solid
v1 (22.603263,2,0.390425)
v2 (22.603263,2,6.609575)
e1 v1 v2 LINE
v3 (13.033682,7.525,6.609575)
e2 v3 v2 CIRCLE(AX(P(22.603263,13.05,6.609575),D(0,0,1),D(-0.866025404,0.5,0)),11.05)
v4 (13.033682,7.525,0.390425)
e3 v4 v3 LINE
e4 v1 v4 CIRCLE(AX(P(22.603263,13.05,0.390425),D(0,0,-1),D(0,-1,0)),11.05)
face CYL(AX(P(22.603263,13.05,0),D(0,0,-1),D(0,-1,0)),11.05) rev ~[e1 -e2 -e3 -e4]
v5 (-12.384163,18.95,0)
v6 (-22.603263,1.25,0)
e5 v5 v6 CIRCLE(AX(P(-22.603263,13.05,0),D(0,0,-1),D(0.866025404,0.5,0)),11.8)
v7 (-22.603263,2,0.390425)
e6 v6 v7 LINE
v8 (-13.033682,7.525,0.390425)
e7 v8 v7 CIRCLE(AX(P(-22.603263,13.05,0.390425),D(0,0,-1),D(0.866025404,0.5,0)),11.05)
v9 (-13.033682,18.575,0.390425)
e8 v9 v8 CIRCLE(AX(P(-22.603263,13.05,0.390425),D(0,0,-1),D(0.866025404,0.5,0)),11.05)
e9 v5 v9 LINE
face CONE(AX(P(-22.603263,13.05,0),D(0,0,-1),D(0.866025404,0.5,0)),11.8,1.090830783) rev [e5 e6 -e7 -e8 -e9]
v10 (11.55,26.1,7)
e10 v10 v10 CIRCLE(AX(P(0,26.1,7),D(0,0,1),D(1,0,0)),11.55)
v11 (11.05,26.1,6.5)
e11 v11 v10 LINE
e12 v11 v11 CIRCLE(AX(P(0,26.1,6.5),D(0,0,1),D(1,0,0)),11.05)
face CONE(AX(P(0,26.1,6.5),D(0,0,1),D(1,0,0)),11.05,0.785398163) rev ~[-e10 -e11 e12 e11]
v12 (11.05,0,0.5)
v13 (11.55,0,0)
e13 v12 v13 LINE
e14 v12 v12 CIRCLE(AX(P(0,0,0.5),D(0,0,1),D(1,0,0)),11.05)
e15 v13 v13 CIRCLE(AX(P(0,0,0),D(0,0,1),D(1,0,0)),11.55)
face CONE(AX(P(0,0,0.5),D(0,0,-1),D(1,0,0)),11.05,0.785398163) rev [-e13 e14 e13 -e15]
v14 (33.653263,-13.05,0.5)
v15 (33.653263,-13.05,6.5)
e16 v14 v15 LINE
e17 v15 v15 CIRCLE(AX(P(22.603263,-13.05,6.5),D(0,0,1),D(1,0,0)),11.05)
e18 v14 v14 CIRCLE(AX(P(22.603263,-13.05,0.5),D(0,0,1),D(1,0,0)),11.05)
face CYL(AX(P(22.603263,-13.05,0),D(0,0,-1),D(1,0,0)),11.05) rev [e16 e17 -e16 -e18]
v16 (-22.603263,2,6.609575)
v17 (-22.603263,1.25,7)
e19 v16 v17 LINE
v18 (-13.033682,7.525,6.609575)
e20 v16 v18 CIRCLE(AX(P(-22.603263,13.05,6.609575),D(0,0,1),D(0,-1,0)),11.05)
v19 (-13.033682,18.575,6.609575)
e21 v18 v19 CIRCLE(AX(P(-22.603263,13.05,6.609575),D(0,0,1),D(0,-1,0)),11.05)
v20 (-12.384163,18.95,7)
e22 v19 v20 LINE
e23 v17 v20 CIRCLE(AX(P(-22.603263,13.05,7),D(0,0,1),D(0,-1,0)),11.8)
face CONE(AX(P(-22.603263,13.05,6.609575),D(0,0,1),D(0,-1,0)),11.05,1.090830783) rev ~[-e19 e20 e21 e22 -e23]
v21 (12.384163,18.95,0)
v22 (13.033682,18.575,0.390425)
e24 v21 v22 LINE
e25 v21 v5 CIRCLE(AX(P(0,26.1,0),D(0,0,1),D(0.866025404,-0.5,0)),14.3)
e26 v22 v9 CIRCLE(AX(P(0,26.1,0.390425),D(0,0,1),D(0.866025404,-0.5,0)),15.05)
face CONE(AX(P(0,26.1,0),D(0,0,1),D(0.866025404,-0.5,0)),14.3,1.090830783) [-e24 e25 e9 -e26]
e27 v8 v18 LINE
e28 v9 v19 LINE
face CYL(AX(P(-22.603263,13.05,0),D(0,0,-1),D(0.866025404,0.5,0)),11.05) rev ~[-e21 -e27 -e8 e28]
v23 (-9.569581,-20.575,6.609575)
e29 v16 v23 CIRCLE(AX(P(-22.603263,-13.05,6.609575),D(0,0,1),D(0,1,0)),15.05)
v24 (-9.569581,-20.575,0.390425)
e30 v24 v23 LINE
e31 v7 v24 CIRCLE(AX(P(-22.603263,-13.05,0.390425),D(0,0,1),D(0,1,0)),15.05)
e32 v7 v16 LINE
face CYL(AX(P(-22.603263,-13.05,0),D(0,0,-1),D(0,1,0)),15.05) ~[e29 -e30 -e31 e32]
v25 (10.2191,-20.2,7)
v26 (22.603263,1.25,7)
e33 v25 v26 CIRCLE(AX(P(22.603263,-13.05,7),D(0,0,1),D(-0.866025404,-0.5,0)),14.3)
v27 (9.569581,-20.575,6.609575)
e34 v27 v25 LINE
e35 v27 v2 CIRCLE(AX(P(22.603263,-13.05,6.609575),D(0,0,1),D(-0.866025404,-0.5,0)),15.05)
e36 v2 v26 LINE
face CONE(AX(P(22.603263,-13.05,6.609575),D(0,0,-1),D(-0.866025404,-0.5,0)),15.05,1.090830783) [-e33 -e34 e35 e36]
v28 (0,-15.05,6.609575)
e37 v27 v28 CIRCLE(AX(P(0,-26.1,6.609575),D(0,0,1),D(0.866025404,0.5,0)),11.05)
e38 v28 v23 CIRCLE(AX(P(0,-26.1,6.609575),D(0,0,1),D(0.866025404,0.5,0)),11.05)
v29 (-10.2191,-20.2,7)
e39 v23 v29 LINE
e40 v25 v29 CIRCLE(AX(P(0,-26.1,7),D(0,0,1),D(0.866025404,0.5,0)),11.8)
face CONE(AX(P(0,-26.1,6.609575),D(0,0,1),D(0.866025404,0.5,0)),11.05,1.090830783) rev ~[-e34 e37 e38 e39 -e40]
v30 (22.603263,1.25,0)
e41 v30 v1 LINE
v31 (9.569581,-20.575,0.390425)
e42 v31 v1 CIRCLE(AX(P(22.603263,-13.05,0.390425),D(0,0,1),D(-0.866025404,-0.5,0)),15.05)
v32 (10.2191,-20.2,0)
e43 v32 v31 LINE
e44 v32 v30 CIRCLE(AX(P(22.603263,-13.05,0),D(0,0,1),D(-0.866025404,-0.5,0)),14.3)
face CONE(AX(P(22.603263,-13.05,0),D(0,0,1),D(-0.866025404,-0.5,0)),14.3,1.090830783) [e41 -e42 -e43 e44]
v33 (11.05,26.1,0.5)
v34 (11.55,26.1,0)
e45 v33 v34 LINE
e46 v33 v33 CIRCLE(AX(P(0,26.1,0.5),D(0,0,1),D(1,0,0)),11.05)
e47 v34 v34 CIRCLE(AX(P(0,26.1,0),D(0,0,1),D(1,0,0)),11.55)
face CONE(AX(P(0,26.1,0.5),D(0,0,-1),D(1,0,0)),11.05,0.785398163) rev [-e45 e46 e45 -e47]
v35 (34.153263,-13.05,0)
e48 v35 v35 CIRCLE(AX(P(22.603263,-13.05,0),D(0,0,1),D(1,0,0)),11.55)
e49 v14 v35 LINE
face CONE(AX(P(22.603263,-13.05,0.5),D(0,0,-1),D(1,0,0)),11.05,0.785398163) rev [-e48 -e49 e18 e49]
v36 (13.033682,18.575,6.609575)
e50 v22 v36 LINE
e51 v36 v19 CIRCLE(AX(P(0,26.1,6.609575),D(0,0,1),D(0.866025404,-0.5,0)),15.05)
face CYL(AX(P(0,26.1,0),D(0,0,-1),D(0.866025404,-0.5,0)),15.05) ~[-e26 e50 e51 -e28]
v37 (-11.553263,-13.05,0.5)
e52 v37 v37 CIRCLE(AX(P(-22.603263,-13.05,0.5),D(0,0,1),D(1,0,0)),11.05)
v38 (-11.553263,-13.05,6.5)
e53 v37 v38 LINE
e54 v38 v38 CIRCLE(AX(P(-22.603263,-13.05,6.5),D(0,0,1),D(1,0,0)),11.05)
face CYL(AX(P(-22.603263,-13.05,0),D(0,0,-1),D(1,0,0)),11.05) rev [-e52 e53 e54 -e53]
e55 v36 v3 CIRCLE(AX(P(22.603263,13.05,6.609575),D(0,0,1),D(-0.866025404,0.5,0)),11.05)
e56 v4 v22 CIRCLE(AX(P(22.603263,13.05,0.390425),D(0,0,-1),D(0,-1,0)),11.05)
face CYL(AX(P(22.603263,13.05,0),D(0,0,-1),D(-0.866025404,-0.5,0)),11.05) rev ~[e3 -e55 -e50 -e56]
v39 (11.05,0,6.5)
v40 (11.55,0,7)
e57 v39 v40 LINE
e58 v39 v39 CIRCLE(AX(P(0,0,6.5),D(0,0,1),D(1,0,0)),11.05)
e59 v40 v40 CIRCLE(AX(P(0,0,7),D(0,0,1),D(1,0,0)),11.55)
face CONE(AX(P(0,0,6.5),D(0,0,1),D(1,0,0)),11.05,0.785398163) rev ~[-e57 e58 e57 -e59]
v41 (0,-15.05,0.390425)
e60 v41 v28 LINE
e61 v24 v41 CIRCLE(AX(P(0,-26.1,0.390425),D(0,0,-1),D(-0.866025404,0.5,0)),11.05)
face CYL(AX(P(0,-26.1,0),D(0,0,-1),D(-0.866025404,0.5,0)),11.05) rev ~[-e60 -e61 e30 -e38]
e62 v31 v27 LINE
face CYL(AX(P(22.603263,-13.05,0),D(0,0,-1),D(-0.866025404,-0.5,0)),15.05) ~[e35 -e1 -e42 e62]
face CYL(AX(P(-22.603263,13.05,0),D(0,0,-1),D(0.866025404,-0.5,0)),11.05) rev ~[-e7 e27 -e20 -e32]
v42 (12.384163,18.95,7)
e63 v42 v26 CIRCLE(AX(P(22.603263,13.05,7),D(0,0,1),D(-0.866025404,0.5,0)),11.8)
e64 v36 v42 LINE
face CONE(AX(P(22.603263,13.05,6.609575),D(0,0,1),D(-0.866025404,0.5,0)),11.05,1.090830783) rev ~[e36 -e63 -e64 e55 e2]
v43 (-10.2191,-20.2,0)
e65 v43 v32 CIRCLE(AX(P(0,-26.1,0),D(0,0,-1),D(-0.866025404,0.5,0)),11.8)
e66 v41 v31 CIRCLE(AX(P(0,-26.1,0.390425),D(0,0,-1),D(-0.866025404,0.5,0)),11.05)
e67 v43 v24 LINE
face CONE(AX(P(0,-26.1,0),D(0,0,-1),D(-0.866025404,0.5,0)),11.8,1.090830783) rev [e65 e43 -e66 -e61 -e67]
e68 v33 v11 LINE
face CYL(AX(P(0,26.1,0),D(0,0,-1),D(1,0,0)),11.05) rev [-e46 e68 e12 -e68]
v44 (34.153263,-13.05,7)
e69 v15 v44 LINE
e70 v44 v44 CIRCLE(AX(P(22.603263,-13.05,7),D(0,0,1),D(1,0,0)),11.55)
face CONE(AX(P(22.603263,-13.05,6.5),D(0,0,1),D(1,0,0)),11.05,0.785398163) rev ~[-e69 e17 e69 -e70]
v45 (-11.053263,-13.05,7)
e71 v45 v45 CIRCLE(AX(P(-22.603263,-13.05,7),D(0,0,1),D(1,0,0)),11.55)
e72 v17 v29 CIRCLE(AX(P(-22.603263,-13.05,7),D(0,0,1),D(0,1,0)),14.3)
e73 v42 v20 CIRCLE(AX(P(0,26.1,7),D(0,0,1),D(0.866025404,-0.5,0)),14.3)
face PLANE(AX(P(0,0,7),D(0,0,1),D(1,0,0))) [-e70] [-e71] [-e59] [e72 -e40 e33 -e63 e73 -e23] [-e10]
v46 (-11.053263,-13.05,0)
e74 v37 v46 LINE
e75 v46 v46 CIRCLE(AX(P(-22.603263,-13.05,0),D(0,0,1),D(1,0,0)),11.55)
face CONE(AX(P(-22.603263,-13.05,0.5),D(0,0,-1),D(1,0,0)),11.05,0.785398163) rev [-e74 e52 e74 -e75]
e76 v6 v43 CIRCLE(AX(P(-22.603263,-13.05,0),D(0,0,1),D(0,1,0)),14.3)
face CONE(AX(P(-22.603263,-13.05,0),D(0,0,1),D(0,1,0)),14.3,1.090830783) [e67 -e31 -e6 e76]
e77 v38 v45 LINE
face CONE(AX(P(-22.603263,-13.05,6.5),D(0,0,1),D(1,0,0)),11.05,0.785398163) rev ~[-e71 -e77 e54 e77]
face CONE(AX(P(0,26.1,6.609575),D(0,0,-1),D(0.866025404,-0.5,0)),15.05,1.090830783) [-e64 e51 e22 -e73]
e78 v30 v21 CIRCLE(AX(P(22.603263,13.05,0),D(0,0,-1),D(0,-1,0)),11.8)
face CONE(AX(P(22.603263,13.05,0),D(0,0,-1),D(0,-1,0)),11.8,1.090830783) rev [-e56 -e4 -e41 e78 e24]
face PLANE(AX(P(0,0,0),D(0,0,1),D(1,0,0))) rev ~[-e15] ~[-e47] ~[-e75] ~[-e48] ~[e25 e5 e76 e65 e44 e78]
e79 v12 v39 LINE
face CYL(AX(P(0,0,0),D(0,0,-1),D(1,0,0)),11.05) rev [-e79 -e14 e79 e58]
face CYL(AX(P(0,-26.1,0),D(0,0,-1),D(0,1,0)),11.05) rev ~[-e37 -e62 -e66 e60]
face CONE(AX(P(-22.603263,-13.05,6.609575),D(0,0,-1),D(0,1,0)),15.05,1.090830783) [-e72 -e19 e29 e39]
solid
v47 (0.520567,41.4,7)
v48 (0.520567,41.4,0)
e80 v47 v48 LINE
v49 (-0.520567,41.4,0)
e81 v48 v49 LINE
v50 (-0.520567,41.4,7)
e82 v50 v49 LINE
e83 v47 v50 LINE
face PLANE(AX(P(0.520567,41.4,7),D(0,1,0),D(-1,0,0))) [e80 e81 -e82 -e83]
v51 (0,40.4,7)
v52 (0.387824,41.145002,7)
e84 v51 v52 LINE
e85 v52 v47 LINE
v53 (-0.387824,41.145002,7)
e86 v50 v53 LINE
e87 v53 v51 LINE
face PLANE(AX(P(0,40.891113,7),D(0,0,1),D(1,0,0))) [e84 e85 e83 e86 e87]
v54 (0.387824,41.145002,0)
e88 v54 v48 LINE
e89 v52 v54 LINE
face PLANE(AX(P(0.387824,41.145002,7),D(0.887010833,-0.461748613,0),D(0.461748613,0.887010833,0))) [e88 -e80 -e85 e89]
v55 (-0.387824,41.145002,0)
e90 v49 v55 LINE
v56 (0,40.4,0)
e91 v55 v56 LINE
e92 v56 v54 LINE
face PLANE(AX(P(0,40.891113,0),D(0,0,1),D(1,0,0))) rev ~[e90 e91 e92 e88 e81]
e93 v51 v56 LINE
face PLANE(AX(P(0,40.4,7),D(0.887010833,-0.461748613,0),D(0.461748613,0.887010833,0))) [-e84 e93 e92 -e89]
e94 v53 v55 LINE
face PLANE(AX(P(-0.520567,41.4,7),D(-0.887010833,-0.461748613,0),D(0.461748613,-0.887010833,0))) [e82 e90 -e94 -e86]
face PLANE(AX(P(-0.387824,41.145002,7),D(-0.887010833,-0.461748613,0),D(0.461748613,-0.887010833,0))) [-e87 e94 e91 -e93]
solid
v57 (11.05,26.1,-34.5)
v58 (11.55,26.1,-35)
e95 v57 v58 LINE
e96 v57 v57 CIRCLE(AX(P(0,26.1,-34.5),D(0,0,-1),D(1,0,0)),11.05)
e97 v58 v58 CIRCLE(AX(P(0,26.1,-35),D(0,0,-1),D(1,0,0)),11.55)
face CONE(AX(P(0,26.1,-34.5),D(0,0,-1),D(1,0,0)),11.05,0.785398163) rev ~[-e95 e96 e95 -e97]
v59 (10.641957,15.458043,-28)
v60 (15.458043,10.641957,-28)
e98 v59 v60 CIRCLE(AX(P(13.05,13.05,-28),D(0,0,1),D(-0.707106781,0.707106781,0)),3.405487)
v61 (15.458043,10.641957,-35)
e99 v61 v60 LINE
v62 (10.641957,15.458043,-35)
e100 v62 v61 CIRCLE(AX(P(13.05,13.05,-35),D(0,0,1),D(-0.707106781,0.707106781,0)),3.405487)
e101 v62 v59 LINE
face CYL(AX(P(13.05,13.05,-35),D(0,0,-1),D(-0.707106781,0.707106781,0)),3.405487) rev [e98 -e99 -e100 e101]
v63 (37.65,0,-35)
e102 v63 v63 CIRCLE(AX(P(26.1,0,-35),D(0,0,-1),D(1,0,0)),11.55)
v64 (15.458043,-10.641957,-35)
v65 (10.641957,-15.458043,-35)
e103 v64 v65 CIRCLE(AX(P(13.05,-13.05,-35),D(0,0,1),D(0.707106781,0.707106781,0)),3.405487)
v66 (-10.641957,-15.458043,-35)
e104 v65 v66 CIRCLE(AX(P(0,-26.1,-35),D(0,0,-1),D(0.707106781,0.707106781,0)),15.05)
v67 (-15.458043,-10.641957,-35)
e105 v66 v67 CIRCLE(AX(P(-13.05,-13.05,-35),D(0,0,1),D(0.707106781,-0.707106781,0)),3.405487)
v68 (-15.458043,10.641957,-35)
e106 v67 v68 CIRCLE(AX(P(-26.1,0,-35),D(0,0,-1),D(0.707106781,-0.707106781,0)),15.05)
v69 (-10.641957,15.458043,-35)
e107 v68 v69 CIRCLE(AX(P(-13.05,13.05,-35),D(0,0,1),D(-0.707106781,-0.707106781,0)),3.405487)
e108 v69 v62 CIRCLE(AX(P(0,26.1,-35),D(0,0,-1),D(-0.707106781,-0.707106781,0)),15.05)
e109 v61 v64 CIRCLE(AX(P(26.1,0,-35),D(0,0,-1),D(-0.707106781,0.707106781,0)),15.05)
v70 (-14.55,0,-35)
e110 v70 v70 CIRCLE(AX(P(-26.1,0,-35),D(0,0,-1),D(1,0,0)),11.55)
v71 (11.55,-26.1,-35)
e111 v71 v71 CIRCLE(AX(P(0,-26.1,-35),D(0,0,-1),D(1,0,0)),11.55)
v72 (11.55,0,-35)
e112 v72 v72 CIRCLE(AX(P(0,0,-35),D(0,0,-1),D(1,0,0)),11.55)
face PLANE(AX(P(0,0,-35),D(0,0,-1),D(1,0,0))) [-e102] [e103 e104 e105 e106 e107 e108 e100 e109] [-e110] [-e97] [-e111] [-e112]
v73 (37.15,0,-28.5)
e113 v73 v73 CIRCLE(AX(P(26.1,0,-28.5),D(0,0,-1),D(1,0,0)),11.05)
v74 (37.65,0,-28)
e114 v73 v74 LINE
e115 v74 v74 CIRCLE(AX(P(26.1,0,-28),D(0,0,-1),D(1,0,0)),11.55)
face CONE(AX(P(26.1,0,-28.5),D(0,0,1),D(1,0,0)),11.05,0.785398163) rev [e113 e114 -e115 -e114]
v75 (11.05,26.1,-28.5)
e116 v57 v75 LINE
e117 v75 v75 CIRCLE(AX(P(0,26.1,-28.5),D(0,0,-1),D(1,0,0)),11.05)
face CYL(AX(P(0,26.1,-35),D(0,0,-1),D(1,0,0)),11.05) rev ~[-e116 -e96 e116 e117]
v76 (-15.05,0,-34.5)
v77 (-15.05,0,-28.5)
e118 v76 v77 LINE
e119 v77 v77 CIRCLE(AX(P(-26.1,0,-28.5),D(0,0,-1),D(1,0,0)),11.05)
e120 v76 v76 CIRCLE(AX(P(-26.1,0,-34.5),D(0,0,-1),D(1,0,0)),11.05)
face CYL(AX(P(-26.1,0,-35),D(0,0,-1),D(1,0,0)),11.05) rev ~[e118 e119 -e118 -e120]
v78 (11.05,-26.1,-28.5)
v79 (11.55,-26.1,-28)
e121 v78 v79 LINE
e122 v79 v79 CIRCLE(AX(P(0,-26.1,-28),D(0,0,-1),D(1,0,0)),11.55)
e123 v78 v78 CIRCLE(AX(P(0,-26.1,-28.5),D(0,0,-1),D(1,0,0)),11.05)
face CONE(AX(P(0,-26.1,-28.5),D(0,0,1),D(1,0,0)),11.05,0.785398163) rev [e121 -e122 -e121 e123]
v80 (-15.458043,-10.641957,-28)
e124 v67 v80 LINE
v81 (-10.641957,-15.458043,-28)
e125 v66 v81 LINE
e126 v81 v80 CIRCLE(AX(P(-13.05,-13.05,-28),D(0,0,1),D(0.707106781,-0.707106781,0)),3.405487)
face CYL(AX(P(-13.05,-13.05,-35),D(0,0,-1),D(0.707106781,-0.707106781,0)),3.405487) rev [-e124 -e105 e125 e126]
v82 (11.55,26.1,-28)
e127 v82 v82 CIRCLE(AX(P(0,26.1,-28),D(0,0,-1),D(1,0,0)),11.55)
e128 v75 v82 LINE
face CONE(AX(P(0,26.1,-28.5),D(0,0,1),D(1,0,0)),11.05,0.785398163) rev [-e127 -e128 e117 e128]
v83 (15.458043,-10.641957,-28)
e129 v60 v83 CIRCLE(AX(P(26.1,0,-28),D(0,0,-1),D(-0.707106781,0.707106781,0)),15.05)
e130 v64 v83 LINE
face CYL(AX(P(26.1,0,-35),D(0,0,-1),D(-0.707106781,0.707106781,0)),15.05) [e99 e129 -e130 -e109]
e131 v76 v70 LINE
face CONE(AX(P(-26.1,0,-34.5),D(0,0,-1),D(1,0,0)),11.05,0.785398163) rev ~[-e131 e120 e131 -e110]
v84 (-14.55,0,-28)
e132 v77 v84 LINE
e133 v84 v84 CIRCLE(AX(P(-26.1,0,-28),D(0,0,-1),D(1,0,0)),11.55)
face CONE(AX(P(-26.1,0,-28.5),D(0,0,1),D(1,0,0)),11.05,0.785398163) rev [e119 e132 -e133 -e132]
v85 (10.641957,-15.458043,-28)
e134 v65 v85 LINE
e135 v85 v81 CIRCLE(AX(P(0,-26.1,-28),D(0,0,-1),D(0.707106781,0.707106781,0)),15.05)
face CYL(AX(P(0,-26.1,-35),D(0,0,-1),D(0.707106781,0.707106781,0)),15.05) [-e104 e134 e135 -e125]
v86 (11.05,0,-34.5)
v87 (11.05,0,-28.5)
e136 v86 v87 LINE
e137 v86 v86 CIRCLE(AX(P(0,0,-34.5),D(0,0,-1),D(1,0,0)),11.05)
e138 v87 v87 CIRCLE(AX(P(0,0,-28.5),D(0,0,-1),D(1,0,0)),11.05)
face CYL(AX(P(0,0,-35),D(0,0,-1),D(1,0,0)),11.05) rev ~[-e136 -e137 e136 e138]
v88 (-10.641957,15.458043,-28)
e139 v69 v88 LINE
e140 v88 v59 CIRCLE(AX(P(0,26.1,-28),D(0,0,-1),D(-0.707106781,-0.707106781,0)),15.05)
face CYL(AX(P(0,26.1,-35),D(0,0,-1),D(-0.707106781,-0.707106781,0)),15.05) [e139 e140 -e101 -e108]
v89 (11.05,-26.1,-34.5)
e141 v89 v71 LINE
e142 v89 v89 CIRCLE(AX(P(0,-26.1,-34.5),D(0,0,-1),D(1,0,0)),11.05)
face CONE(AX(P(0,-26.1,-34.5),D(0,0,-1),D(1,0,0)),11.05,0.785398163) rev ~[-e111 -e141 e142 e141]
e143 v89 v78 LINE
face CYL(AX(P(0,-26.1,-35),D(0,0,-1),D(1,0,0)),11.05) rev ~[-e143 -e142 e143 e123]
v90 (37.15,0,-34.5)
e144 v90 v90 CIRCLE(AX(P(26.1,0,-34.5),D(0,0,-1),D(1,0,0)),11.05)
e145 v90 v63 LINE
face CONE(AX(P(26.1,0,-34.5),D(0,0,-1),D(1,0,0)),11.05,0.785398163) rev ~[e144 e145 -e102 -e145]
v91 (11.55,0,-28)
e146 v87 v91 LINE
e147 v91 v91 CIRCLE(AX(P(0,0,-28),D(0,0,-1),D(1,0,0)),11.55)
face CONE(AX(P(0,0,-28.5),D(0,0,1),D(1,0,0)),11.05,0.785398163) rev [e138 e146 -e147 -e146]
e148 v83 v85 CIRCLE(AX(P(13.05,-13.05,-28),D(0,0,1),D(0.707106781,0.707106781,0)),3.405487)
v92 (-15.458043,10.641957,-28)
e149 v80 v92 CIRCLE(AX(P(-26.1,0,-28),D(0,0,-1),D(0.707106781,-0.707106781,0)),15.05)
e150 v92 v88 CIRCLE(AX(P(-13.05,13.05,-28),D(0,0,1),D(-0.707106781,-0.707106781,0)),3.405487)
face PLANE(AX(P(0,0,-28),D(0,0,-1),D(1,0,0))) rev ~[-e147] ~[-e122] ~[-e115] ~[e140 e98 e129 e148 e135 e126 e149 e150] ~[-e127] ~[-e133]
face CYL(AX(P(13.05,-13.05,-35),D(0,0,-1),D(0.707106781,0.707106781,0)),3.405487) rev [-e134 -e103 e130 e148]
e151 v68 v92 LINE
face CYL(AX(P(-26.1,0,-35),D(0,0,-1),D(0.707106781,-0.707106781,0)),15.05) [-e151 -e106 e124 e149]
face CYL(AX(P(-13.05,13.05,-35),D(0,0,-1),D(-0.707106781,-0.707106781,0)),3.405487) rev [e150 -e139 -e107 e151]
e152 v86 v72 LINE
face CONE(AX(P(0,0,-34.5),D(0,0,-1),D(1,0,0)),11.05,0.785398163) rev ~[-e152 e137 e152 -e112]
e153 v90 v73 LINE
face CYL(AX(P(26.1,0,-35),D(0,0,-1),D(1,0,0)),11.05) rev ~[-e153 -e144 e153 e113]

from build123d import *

# Parameters (mm, degrees)
F0_R         = 11.05
F1_DEPTH     = 7
F2_SIZE      = 0.5
F4_R         = 11.05
F5_DEPTH     = 7
F6_SIZE      = 0.5
F8_T2_ANGLE  = 120
F8_T4_ANGLE  = 120
F8_T6_ANGLE  = 240
F8_T8_ANGLE  = 120
F8_T10_ANGLE = 240
F8_T12_ANGLE = 120
F8_T14_ANGLE = 120
F8_T16_ANGLE = 240
F8_T18_ANGLE = 120
F8_T20_ANGLE = 240
F8_T22_ANGLE = 240
F8_T24_ANGLE = 240
F9_DEPTH     = 7


# Not quite as in the source:
# - a fillet or chamfer that OpenCascade refuses, or shapes differently, is made with other operations: its cross-section is extruded or revolved along the edge and cut away or added


with BuildPart() as f1:
    # F0 (on Top) → F1 (new body)
    with BuildSketch(Plane.XY):
        with BuildLine():
            ThreePointArc((13.033682327, 7.525), (11.5532630388, 13.05), (13.033682327, 18.575))
            ThreePointArc((13.033682327, 18.575), (0, 41.15), (-13.033682327, 18.575))
            ThreePointArc((-13.033682327, 18.575), (-11.5532630388, 13.05), (-13.033682327, 7.525))
            ThreePointArc((-13.033682327, 7.525), (-17.0782630388, 3.4804192882), (-22.6032630388, 2))
            ThreePointArc((-22.6032630388, 2), (-35.6369453657, -20.575), (-9.5695807118, -20.575))
            ThreePointArc((-9.5695807118, -20.575), (-5.525, -16.5304192882), (0, -15.05))
            ThreePointArc((0, -15.05), (5.525, -16.5304192882), (9.5695807118, -20.575))
            ThreePointArc((9.5695807118, -20.575), (35.6369453657, -20.575), (22.6032630388, 2))
            ThreePointArc((22.6032630388, 2), (17.0782630388, 3.4804192882), (13.033682327, 7.525))
        make_face()
        with Locations((-22.6032630388, -13.05)):
            Circle(F0_R, mode=Mode.SUBTRACT)
        with Locations((22.6032630388, -13.05)):
            Circle(F0_R, mode=Mode.SUBTRACT)
        Circle(F0_R, mode=Mode.SUBTRACT)
        with Locations((0, 26.1)):
            Circle(F0_R, mode=Mode.SUBTRACT)
    extrude(amount=F1_DEPTH)

    # F2
    f2_edges = [f1.edges().sort_by_distance(p)[0] for p in [
        (-11.553263, -13.05, 3.5),
        (-33.653263, -13.05, 0),
        (-33.653263, -13.05, 7),
        (11.05, 0, 3.5),
        (-11.05, 0, 0),
        (-11.05, 0, 7),
        (11.05, 26.1, 3.5),
        (-11.05, 26.1, 0),
        (-11.05, 26.1, 7),
        (33.653263, -13.05, 3.5),
        (11.553263, -13.05, 0),
        (11.553263, -13.05, 7),
    ]]
    chamfer(f2_edges, length=F2_SIZE)

    # F8: chamfer of 0.75 x 0.3904252879 on 10 edges, made by hand

    # F8_s1 → F8_t2 (revolve, cut)
    with BuildSketch(Plane.YZ.offset(22.6032630388)):
        Polygon((1.25, 0), (2, 0.3904252879), (2, 0), align=None)
    revolve(axis=Axis((22.6032630388, 13.05, 0), (0, 0, -1)), revolution_arc=F8_T2_ANGLE, mode=Mode.SUBTRACT)

    # F8_s3 → F8_t4 (revolve, cut)
    with BuildSketch(Plane(origin=(-11.3016315194, 19.575, 0), x_dir=(0, 0, 1), z_dir=(-0.5, 0.8660254038, 0))):
        Polygon((0, -1.25), (0.3904252879, -2), (0, -2), align=None)
    revolve(axis=Axis((-22.6032630388, 13.05, 0), (0, 0, -1)), revolution_arc=F8_T4_ANGLE, mode=Mode.SUBTRACT)

    # F8_s5 → F8_t6 (revolve, cut)
    with BuildSketch(Plane.YZ.offset(-22.6032630388)):
        Polygon((1.25, 0), (2, 0.3904252879), (2, 0), align=None)
    revolve(axis=Axis((-22.6032630388, -13.05, 0), (0, 0, 1)), revolution_arc=F8_T6_ANGLE, mode=Mode.SUBTRACT)

    # F8_s7 → F8_t8 (revolve, cut)
    with BuildSketch(Plane(origin=(-11.3016315194, -19.575, 0), x_dir=(0, 0, 1), z_dir=(-0.5, -0.8660254038, 0))):
        Polygon((0, -1.25), (0.3904252879, -2), (0, -2), align=None)
    revolve(axis=Axis((0, -26.1, 0), (0, 0, -1)), revolution_arc=F8_T8_ANGLE, mode=Mode.SUBTRACT)

    # F8_s9 → F8_t10 (revolve, cut)
    with BuildSketch(Plane(origin=(11.3016315194, -19.575, 0), x_dir=(0, 0, 1), z_dir=(-0.5, 0.8660254038, 0))):
        Polygon((0, -1.25), (0.3904252879, -2), (0, -2), align=None)
    revolve(axis=Axis((22.6032630388, -13.05, 0), (0, 0, 1)), revolution_arc=F8_T10_ANGLE, mode=Mode.SUBTRACT)

    # F8_s11 → F8_t12 (revolve, cut)
    with BuildSketch(Plane(origin=(11.3016315194, 19.575, 0), x_dir=(0, 0, 1), z_dir=(0.5, 0.8660254038, 0))):
        Polygon((6.6095747121, 2), (7, 1.25), (7, 2), align=None)
    revolve(axis=Axis((22.6032630388, 13.05, 7), (0, 0, 1)), revolution_arc=F8_T12_ANGLE, mode=Mode.SUBTRACT)

    # F8_s13 → F8_t14 (revolve, cut)
    with BuildSketch(Plane.YZ.offset(-22.6032630388)):
        Polygon((2, 6.6095747121), (1.25, 7), (2, 7), align=None)
    revolve(axis=Axis((-22.6032630388, 13.05, 7), (0, 0, 1)), revolution_arc=F8_T14_ANGLE, mode=Mode.SUBTRACT)

    # F8_s15 → F8_t16 (revolve, cut)
    with BuildSketch(Plane.YZ.offset(-22.6032630388)):
        Polygon((2, 6.6095747121), (1.25, 7), (2, 7), align=None)
    revolve(axis=Axis((-22.6032630388, -13.05, 7), (0, 0, 1)), revolution_arc=F8_T16_ANGLE, mode=Mode.SUBTRACT)

    # F8_s17 → F8_t18 (revolve, cut)
    with BuildSketch(Plane(origin=(11.3016315194, -19.575, 0), x_dir=(0, 0, 1), z_dir=(0.5, -0.8660254038, 0))):
        Polygon((6.6095747121, 2), (7, 1.25), (7, 2), align=None)
    revolve(axis=Axis((0, -26.1, 7), (0, 0, 1)), revolution_arc=F8_T18_ANGLE, mode=Mode.SUBTRACT)

    # F8_s19 → F8_t20 (revolve, cut)
    with BuildSketch(Plane(origin=(11.3016315194, -19.575, 0), x_dir=(0, 0, 1), z_dir=(-0.5, 0.8660254038, 0))):
        Polygon((6.6095747121, -2), (7, -1.25), (7, -2), align=None)
    revolve(axis=Axis((22.6032630388, -13.05, 7), (0, 0, 1)), revolution_arc=F8_T20_ANGLE, mode=Mode.SUBTRACT)

    # F8_s21 → F8_t22 (revolve, cut)
    with BuildSketch(Plane(origin=(11.3016315194, 19.575, 0), x_dir=(0, 0, 1), z_dir=(-0.5, -0.8660254038, 0))):
        Polygon((6.6095747121, -2), (7, -1.25), (7, -2), align=None)
    revolve(axis=Axis((0, 26.1, 7), (0, 0, 1)), revolution_arc=F8_T22_ANGLE, mode=Mode.SUBTRACT)

    # F8_s23 → F8_t24 (revolve, cut)
    with BuildSketch(Plane(origin=(11.3016315194, 19.575, 0), x_dir=(0, 0, 1), z_dir=(-0.5, -0.8660254038, 0))):
        Polygon((0, -1.25), (0.3904252879, -2), (0, -2), align=None)
    revolve(axis=Axis((0, 26.1, 0), (0, 0, 1)), revolution_arc=F8_T24_ANGLE, mode=Mode.SUBTRACT)


with BuildPart() as f5:
    # F4 (on offset) → F5 (new body)
    with BuildSketch(Plane(origin=(0, 0, -35), x_dir=(1, 0, 0), z_dir=(0, 0, -1))):
        with BuildLine():
            ThreePointArc((15.4580429431, 10.6419570569), (10.6419570569, 10.6419570569), (10.6419570569, 15.4580429431))
            ThreePointArc((10.6419570569, 15.4580429431), (0, 41.15), (-10.6419570569, 15.4580429431))
            ThreePointArc((-10.6419570569, 15.4580429431), (-10.6419570569, 10.6419570569), (-15.4580429431, 10.6419570569))
            ThreePointArc((-15.4580429431, 10.6419570569), (-41.15, 0), (-15.4580429431, -10.6419570569))
            ThreePointArc((-15.4580429431, -10.6419570569), (-10.6419570569, -10.6419570569), (-10.6419570569, -15.4580429431))
            ThreePointArc((-10.6419570569, -15.4580429431), (0, -41.15), (10.6419570569, -15.4580429431))
            ThreePointArc((10.6419570569, -15.4580429431), (10.6419570569, -10.6419570569), (15.4580429431, -10.6419570569))
            ThreePointArc((15.4580429431, -10.6419570569), (41.15, 0), (15.4580429431, 10.6419570569))
        make_face()
        with Locations((0, -26.1)):
            Circle(F4_R, mode=Mode.SUBTRACT)
        with Locations((-26.1, 0)):
            Circle(F4_R, mode=Mode.SUBTRACT)
        Circle(F4_R, mode=Mode.SUBTRACT)
        with Locations((0, 26.1)):
            Circle(F4_R, mode=Mode.SUBTRACT)
        with Locations((26.1, 0)):
            Circle(F4_R, mode=Mode.SUBTRACT)
    extrude(amount=-F5_DEPTH)

    # F6
    f6_edges = [f5.edges().sort_by_distance(p)[0] for p in [
        (-15.05, 0, -31.5),
        (-37.15, 0, -35),
        (-37.15, 0, -28),
        (11.05, 0, -31.5),
        (-11.05, 0, -35),
        (-11.05, 0, -28),
        (11.05, 26.1, -31.5),
        (-11.05, 26.1, -35),
        (-11.05, 26.1, -28),
        (37.15, 0, -31.5),
        (15.05, 0, -35),
        (15.05, 0, -28),
        (11.05, -26.1, -31.5),
        (-11.05, -26.1, -35),
        (-11.05, -26.1, -28),
    ]]
    chamfer(f6_edges, length=F6_SIZE)


with BuildPart() as f9:
    # F7 (on face) → F9 (new body, through all)
    with BuildSketch(Plane.XY.offset(7)):
        with BuildLine():
            Line((-0.3878236262, 41.1450022544), (0, 40.4))
            Line((0, 40.4), (0.3878236262, 41.1450022544))
            ThreePointArc((0.3878236262, 41.1450022544), (0, 41.15), (-0.3878236262, 41.1450022544))
        make_face()
        with BuildLine():
            ThreePointArc((-0.3878236262, 41.1450022544), (0, 41.15), (0.3878236262, 41.1450022544))
            Line((0.3878236262, 41.1450022544), (0.5205670506, 41.4))
            Line((0.5205670506, 41.4), (-0.5205670506, 41.4))
            Line((-0.5205670506, 41.4), (-0.3878236262, 41.1450022544))
        make_face()
    extrude(amount=-F9_DEPTH)


solid = Compound([f1.part, f5.part, f9.part])
